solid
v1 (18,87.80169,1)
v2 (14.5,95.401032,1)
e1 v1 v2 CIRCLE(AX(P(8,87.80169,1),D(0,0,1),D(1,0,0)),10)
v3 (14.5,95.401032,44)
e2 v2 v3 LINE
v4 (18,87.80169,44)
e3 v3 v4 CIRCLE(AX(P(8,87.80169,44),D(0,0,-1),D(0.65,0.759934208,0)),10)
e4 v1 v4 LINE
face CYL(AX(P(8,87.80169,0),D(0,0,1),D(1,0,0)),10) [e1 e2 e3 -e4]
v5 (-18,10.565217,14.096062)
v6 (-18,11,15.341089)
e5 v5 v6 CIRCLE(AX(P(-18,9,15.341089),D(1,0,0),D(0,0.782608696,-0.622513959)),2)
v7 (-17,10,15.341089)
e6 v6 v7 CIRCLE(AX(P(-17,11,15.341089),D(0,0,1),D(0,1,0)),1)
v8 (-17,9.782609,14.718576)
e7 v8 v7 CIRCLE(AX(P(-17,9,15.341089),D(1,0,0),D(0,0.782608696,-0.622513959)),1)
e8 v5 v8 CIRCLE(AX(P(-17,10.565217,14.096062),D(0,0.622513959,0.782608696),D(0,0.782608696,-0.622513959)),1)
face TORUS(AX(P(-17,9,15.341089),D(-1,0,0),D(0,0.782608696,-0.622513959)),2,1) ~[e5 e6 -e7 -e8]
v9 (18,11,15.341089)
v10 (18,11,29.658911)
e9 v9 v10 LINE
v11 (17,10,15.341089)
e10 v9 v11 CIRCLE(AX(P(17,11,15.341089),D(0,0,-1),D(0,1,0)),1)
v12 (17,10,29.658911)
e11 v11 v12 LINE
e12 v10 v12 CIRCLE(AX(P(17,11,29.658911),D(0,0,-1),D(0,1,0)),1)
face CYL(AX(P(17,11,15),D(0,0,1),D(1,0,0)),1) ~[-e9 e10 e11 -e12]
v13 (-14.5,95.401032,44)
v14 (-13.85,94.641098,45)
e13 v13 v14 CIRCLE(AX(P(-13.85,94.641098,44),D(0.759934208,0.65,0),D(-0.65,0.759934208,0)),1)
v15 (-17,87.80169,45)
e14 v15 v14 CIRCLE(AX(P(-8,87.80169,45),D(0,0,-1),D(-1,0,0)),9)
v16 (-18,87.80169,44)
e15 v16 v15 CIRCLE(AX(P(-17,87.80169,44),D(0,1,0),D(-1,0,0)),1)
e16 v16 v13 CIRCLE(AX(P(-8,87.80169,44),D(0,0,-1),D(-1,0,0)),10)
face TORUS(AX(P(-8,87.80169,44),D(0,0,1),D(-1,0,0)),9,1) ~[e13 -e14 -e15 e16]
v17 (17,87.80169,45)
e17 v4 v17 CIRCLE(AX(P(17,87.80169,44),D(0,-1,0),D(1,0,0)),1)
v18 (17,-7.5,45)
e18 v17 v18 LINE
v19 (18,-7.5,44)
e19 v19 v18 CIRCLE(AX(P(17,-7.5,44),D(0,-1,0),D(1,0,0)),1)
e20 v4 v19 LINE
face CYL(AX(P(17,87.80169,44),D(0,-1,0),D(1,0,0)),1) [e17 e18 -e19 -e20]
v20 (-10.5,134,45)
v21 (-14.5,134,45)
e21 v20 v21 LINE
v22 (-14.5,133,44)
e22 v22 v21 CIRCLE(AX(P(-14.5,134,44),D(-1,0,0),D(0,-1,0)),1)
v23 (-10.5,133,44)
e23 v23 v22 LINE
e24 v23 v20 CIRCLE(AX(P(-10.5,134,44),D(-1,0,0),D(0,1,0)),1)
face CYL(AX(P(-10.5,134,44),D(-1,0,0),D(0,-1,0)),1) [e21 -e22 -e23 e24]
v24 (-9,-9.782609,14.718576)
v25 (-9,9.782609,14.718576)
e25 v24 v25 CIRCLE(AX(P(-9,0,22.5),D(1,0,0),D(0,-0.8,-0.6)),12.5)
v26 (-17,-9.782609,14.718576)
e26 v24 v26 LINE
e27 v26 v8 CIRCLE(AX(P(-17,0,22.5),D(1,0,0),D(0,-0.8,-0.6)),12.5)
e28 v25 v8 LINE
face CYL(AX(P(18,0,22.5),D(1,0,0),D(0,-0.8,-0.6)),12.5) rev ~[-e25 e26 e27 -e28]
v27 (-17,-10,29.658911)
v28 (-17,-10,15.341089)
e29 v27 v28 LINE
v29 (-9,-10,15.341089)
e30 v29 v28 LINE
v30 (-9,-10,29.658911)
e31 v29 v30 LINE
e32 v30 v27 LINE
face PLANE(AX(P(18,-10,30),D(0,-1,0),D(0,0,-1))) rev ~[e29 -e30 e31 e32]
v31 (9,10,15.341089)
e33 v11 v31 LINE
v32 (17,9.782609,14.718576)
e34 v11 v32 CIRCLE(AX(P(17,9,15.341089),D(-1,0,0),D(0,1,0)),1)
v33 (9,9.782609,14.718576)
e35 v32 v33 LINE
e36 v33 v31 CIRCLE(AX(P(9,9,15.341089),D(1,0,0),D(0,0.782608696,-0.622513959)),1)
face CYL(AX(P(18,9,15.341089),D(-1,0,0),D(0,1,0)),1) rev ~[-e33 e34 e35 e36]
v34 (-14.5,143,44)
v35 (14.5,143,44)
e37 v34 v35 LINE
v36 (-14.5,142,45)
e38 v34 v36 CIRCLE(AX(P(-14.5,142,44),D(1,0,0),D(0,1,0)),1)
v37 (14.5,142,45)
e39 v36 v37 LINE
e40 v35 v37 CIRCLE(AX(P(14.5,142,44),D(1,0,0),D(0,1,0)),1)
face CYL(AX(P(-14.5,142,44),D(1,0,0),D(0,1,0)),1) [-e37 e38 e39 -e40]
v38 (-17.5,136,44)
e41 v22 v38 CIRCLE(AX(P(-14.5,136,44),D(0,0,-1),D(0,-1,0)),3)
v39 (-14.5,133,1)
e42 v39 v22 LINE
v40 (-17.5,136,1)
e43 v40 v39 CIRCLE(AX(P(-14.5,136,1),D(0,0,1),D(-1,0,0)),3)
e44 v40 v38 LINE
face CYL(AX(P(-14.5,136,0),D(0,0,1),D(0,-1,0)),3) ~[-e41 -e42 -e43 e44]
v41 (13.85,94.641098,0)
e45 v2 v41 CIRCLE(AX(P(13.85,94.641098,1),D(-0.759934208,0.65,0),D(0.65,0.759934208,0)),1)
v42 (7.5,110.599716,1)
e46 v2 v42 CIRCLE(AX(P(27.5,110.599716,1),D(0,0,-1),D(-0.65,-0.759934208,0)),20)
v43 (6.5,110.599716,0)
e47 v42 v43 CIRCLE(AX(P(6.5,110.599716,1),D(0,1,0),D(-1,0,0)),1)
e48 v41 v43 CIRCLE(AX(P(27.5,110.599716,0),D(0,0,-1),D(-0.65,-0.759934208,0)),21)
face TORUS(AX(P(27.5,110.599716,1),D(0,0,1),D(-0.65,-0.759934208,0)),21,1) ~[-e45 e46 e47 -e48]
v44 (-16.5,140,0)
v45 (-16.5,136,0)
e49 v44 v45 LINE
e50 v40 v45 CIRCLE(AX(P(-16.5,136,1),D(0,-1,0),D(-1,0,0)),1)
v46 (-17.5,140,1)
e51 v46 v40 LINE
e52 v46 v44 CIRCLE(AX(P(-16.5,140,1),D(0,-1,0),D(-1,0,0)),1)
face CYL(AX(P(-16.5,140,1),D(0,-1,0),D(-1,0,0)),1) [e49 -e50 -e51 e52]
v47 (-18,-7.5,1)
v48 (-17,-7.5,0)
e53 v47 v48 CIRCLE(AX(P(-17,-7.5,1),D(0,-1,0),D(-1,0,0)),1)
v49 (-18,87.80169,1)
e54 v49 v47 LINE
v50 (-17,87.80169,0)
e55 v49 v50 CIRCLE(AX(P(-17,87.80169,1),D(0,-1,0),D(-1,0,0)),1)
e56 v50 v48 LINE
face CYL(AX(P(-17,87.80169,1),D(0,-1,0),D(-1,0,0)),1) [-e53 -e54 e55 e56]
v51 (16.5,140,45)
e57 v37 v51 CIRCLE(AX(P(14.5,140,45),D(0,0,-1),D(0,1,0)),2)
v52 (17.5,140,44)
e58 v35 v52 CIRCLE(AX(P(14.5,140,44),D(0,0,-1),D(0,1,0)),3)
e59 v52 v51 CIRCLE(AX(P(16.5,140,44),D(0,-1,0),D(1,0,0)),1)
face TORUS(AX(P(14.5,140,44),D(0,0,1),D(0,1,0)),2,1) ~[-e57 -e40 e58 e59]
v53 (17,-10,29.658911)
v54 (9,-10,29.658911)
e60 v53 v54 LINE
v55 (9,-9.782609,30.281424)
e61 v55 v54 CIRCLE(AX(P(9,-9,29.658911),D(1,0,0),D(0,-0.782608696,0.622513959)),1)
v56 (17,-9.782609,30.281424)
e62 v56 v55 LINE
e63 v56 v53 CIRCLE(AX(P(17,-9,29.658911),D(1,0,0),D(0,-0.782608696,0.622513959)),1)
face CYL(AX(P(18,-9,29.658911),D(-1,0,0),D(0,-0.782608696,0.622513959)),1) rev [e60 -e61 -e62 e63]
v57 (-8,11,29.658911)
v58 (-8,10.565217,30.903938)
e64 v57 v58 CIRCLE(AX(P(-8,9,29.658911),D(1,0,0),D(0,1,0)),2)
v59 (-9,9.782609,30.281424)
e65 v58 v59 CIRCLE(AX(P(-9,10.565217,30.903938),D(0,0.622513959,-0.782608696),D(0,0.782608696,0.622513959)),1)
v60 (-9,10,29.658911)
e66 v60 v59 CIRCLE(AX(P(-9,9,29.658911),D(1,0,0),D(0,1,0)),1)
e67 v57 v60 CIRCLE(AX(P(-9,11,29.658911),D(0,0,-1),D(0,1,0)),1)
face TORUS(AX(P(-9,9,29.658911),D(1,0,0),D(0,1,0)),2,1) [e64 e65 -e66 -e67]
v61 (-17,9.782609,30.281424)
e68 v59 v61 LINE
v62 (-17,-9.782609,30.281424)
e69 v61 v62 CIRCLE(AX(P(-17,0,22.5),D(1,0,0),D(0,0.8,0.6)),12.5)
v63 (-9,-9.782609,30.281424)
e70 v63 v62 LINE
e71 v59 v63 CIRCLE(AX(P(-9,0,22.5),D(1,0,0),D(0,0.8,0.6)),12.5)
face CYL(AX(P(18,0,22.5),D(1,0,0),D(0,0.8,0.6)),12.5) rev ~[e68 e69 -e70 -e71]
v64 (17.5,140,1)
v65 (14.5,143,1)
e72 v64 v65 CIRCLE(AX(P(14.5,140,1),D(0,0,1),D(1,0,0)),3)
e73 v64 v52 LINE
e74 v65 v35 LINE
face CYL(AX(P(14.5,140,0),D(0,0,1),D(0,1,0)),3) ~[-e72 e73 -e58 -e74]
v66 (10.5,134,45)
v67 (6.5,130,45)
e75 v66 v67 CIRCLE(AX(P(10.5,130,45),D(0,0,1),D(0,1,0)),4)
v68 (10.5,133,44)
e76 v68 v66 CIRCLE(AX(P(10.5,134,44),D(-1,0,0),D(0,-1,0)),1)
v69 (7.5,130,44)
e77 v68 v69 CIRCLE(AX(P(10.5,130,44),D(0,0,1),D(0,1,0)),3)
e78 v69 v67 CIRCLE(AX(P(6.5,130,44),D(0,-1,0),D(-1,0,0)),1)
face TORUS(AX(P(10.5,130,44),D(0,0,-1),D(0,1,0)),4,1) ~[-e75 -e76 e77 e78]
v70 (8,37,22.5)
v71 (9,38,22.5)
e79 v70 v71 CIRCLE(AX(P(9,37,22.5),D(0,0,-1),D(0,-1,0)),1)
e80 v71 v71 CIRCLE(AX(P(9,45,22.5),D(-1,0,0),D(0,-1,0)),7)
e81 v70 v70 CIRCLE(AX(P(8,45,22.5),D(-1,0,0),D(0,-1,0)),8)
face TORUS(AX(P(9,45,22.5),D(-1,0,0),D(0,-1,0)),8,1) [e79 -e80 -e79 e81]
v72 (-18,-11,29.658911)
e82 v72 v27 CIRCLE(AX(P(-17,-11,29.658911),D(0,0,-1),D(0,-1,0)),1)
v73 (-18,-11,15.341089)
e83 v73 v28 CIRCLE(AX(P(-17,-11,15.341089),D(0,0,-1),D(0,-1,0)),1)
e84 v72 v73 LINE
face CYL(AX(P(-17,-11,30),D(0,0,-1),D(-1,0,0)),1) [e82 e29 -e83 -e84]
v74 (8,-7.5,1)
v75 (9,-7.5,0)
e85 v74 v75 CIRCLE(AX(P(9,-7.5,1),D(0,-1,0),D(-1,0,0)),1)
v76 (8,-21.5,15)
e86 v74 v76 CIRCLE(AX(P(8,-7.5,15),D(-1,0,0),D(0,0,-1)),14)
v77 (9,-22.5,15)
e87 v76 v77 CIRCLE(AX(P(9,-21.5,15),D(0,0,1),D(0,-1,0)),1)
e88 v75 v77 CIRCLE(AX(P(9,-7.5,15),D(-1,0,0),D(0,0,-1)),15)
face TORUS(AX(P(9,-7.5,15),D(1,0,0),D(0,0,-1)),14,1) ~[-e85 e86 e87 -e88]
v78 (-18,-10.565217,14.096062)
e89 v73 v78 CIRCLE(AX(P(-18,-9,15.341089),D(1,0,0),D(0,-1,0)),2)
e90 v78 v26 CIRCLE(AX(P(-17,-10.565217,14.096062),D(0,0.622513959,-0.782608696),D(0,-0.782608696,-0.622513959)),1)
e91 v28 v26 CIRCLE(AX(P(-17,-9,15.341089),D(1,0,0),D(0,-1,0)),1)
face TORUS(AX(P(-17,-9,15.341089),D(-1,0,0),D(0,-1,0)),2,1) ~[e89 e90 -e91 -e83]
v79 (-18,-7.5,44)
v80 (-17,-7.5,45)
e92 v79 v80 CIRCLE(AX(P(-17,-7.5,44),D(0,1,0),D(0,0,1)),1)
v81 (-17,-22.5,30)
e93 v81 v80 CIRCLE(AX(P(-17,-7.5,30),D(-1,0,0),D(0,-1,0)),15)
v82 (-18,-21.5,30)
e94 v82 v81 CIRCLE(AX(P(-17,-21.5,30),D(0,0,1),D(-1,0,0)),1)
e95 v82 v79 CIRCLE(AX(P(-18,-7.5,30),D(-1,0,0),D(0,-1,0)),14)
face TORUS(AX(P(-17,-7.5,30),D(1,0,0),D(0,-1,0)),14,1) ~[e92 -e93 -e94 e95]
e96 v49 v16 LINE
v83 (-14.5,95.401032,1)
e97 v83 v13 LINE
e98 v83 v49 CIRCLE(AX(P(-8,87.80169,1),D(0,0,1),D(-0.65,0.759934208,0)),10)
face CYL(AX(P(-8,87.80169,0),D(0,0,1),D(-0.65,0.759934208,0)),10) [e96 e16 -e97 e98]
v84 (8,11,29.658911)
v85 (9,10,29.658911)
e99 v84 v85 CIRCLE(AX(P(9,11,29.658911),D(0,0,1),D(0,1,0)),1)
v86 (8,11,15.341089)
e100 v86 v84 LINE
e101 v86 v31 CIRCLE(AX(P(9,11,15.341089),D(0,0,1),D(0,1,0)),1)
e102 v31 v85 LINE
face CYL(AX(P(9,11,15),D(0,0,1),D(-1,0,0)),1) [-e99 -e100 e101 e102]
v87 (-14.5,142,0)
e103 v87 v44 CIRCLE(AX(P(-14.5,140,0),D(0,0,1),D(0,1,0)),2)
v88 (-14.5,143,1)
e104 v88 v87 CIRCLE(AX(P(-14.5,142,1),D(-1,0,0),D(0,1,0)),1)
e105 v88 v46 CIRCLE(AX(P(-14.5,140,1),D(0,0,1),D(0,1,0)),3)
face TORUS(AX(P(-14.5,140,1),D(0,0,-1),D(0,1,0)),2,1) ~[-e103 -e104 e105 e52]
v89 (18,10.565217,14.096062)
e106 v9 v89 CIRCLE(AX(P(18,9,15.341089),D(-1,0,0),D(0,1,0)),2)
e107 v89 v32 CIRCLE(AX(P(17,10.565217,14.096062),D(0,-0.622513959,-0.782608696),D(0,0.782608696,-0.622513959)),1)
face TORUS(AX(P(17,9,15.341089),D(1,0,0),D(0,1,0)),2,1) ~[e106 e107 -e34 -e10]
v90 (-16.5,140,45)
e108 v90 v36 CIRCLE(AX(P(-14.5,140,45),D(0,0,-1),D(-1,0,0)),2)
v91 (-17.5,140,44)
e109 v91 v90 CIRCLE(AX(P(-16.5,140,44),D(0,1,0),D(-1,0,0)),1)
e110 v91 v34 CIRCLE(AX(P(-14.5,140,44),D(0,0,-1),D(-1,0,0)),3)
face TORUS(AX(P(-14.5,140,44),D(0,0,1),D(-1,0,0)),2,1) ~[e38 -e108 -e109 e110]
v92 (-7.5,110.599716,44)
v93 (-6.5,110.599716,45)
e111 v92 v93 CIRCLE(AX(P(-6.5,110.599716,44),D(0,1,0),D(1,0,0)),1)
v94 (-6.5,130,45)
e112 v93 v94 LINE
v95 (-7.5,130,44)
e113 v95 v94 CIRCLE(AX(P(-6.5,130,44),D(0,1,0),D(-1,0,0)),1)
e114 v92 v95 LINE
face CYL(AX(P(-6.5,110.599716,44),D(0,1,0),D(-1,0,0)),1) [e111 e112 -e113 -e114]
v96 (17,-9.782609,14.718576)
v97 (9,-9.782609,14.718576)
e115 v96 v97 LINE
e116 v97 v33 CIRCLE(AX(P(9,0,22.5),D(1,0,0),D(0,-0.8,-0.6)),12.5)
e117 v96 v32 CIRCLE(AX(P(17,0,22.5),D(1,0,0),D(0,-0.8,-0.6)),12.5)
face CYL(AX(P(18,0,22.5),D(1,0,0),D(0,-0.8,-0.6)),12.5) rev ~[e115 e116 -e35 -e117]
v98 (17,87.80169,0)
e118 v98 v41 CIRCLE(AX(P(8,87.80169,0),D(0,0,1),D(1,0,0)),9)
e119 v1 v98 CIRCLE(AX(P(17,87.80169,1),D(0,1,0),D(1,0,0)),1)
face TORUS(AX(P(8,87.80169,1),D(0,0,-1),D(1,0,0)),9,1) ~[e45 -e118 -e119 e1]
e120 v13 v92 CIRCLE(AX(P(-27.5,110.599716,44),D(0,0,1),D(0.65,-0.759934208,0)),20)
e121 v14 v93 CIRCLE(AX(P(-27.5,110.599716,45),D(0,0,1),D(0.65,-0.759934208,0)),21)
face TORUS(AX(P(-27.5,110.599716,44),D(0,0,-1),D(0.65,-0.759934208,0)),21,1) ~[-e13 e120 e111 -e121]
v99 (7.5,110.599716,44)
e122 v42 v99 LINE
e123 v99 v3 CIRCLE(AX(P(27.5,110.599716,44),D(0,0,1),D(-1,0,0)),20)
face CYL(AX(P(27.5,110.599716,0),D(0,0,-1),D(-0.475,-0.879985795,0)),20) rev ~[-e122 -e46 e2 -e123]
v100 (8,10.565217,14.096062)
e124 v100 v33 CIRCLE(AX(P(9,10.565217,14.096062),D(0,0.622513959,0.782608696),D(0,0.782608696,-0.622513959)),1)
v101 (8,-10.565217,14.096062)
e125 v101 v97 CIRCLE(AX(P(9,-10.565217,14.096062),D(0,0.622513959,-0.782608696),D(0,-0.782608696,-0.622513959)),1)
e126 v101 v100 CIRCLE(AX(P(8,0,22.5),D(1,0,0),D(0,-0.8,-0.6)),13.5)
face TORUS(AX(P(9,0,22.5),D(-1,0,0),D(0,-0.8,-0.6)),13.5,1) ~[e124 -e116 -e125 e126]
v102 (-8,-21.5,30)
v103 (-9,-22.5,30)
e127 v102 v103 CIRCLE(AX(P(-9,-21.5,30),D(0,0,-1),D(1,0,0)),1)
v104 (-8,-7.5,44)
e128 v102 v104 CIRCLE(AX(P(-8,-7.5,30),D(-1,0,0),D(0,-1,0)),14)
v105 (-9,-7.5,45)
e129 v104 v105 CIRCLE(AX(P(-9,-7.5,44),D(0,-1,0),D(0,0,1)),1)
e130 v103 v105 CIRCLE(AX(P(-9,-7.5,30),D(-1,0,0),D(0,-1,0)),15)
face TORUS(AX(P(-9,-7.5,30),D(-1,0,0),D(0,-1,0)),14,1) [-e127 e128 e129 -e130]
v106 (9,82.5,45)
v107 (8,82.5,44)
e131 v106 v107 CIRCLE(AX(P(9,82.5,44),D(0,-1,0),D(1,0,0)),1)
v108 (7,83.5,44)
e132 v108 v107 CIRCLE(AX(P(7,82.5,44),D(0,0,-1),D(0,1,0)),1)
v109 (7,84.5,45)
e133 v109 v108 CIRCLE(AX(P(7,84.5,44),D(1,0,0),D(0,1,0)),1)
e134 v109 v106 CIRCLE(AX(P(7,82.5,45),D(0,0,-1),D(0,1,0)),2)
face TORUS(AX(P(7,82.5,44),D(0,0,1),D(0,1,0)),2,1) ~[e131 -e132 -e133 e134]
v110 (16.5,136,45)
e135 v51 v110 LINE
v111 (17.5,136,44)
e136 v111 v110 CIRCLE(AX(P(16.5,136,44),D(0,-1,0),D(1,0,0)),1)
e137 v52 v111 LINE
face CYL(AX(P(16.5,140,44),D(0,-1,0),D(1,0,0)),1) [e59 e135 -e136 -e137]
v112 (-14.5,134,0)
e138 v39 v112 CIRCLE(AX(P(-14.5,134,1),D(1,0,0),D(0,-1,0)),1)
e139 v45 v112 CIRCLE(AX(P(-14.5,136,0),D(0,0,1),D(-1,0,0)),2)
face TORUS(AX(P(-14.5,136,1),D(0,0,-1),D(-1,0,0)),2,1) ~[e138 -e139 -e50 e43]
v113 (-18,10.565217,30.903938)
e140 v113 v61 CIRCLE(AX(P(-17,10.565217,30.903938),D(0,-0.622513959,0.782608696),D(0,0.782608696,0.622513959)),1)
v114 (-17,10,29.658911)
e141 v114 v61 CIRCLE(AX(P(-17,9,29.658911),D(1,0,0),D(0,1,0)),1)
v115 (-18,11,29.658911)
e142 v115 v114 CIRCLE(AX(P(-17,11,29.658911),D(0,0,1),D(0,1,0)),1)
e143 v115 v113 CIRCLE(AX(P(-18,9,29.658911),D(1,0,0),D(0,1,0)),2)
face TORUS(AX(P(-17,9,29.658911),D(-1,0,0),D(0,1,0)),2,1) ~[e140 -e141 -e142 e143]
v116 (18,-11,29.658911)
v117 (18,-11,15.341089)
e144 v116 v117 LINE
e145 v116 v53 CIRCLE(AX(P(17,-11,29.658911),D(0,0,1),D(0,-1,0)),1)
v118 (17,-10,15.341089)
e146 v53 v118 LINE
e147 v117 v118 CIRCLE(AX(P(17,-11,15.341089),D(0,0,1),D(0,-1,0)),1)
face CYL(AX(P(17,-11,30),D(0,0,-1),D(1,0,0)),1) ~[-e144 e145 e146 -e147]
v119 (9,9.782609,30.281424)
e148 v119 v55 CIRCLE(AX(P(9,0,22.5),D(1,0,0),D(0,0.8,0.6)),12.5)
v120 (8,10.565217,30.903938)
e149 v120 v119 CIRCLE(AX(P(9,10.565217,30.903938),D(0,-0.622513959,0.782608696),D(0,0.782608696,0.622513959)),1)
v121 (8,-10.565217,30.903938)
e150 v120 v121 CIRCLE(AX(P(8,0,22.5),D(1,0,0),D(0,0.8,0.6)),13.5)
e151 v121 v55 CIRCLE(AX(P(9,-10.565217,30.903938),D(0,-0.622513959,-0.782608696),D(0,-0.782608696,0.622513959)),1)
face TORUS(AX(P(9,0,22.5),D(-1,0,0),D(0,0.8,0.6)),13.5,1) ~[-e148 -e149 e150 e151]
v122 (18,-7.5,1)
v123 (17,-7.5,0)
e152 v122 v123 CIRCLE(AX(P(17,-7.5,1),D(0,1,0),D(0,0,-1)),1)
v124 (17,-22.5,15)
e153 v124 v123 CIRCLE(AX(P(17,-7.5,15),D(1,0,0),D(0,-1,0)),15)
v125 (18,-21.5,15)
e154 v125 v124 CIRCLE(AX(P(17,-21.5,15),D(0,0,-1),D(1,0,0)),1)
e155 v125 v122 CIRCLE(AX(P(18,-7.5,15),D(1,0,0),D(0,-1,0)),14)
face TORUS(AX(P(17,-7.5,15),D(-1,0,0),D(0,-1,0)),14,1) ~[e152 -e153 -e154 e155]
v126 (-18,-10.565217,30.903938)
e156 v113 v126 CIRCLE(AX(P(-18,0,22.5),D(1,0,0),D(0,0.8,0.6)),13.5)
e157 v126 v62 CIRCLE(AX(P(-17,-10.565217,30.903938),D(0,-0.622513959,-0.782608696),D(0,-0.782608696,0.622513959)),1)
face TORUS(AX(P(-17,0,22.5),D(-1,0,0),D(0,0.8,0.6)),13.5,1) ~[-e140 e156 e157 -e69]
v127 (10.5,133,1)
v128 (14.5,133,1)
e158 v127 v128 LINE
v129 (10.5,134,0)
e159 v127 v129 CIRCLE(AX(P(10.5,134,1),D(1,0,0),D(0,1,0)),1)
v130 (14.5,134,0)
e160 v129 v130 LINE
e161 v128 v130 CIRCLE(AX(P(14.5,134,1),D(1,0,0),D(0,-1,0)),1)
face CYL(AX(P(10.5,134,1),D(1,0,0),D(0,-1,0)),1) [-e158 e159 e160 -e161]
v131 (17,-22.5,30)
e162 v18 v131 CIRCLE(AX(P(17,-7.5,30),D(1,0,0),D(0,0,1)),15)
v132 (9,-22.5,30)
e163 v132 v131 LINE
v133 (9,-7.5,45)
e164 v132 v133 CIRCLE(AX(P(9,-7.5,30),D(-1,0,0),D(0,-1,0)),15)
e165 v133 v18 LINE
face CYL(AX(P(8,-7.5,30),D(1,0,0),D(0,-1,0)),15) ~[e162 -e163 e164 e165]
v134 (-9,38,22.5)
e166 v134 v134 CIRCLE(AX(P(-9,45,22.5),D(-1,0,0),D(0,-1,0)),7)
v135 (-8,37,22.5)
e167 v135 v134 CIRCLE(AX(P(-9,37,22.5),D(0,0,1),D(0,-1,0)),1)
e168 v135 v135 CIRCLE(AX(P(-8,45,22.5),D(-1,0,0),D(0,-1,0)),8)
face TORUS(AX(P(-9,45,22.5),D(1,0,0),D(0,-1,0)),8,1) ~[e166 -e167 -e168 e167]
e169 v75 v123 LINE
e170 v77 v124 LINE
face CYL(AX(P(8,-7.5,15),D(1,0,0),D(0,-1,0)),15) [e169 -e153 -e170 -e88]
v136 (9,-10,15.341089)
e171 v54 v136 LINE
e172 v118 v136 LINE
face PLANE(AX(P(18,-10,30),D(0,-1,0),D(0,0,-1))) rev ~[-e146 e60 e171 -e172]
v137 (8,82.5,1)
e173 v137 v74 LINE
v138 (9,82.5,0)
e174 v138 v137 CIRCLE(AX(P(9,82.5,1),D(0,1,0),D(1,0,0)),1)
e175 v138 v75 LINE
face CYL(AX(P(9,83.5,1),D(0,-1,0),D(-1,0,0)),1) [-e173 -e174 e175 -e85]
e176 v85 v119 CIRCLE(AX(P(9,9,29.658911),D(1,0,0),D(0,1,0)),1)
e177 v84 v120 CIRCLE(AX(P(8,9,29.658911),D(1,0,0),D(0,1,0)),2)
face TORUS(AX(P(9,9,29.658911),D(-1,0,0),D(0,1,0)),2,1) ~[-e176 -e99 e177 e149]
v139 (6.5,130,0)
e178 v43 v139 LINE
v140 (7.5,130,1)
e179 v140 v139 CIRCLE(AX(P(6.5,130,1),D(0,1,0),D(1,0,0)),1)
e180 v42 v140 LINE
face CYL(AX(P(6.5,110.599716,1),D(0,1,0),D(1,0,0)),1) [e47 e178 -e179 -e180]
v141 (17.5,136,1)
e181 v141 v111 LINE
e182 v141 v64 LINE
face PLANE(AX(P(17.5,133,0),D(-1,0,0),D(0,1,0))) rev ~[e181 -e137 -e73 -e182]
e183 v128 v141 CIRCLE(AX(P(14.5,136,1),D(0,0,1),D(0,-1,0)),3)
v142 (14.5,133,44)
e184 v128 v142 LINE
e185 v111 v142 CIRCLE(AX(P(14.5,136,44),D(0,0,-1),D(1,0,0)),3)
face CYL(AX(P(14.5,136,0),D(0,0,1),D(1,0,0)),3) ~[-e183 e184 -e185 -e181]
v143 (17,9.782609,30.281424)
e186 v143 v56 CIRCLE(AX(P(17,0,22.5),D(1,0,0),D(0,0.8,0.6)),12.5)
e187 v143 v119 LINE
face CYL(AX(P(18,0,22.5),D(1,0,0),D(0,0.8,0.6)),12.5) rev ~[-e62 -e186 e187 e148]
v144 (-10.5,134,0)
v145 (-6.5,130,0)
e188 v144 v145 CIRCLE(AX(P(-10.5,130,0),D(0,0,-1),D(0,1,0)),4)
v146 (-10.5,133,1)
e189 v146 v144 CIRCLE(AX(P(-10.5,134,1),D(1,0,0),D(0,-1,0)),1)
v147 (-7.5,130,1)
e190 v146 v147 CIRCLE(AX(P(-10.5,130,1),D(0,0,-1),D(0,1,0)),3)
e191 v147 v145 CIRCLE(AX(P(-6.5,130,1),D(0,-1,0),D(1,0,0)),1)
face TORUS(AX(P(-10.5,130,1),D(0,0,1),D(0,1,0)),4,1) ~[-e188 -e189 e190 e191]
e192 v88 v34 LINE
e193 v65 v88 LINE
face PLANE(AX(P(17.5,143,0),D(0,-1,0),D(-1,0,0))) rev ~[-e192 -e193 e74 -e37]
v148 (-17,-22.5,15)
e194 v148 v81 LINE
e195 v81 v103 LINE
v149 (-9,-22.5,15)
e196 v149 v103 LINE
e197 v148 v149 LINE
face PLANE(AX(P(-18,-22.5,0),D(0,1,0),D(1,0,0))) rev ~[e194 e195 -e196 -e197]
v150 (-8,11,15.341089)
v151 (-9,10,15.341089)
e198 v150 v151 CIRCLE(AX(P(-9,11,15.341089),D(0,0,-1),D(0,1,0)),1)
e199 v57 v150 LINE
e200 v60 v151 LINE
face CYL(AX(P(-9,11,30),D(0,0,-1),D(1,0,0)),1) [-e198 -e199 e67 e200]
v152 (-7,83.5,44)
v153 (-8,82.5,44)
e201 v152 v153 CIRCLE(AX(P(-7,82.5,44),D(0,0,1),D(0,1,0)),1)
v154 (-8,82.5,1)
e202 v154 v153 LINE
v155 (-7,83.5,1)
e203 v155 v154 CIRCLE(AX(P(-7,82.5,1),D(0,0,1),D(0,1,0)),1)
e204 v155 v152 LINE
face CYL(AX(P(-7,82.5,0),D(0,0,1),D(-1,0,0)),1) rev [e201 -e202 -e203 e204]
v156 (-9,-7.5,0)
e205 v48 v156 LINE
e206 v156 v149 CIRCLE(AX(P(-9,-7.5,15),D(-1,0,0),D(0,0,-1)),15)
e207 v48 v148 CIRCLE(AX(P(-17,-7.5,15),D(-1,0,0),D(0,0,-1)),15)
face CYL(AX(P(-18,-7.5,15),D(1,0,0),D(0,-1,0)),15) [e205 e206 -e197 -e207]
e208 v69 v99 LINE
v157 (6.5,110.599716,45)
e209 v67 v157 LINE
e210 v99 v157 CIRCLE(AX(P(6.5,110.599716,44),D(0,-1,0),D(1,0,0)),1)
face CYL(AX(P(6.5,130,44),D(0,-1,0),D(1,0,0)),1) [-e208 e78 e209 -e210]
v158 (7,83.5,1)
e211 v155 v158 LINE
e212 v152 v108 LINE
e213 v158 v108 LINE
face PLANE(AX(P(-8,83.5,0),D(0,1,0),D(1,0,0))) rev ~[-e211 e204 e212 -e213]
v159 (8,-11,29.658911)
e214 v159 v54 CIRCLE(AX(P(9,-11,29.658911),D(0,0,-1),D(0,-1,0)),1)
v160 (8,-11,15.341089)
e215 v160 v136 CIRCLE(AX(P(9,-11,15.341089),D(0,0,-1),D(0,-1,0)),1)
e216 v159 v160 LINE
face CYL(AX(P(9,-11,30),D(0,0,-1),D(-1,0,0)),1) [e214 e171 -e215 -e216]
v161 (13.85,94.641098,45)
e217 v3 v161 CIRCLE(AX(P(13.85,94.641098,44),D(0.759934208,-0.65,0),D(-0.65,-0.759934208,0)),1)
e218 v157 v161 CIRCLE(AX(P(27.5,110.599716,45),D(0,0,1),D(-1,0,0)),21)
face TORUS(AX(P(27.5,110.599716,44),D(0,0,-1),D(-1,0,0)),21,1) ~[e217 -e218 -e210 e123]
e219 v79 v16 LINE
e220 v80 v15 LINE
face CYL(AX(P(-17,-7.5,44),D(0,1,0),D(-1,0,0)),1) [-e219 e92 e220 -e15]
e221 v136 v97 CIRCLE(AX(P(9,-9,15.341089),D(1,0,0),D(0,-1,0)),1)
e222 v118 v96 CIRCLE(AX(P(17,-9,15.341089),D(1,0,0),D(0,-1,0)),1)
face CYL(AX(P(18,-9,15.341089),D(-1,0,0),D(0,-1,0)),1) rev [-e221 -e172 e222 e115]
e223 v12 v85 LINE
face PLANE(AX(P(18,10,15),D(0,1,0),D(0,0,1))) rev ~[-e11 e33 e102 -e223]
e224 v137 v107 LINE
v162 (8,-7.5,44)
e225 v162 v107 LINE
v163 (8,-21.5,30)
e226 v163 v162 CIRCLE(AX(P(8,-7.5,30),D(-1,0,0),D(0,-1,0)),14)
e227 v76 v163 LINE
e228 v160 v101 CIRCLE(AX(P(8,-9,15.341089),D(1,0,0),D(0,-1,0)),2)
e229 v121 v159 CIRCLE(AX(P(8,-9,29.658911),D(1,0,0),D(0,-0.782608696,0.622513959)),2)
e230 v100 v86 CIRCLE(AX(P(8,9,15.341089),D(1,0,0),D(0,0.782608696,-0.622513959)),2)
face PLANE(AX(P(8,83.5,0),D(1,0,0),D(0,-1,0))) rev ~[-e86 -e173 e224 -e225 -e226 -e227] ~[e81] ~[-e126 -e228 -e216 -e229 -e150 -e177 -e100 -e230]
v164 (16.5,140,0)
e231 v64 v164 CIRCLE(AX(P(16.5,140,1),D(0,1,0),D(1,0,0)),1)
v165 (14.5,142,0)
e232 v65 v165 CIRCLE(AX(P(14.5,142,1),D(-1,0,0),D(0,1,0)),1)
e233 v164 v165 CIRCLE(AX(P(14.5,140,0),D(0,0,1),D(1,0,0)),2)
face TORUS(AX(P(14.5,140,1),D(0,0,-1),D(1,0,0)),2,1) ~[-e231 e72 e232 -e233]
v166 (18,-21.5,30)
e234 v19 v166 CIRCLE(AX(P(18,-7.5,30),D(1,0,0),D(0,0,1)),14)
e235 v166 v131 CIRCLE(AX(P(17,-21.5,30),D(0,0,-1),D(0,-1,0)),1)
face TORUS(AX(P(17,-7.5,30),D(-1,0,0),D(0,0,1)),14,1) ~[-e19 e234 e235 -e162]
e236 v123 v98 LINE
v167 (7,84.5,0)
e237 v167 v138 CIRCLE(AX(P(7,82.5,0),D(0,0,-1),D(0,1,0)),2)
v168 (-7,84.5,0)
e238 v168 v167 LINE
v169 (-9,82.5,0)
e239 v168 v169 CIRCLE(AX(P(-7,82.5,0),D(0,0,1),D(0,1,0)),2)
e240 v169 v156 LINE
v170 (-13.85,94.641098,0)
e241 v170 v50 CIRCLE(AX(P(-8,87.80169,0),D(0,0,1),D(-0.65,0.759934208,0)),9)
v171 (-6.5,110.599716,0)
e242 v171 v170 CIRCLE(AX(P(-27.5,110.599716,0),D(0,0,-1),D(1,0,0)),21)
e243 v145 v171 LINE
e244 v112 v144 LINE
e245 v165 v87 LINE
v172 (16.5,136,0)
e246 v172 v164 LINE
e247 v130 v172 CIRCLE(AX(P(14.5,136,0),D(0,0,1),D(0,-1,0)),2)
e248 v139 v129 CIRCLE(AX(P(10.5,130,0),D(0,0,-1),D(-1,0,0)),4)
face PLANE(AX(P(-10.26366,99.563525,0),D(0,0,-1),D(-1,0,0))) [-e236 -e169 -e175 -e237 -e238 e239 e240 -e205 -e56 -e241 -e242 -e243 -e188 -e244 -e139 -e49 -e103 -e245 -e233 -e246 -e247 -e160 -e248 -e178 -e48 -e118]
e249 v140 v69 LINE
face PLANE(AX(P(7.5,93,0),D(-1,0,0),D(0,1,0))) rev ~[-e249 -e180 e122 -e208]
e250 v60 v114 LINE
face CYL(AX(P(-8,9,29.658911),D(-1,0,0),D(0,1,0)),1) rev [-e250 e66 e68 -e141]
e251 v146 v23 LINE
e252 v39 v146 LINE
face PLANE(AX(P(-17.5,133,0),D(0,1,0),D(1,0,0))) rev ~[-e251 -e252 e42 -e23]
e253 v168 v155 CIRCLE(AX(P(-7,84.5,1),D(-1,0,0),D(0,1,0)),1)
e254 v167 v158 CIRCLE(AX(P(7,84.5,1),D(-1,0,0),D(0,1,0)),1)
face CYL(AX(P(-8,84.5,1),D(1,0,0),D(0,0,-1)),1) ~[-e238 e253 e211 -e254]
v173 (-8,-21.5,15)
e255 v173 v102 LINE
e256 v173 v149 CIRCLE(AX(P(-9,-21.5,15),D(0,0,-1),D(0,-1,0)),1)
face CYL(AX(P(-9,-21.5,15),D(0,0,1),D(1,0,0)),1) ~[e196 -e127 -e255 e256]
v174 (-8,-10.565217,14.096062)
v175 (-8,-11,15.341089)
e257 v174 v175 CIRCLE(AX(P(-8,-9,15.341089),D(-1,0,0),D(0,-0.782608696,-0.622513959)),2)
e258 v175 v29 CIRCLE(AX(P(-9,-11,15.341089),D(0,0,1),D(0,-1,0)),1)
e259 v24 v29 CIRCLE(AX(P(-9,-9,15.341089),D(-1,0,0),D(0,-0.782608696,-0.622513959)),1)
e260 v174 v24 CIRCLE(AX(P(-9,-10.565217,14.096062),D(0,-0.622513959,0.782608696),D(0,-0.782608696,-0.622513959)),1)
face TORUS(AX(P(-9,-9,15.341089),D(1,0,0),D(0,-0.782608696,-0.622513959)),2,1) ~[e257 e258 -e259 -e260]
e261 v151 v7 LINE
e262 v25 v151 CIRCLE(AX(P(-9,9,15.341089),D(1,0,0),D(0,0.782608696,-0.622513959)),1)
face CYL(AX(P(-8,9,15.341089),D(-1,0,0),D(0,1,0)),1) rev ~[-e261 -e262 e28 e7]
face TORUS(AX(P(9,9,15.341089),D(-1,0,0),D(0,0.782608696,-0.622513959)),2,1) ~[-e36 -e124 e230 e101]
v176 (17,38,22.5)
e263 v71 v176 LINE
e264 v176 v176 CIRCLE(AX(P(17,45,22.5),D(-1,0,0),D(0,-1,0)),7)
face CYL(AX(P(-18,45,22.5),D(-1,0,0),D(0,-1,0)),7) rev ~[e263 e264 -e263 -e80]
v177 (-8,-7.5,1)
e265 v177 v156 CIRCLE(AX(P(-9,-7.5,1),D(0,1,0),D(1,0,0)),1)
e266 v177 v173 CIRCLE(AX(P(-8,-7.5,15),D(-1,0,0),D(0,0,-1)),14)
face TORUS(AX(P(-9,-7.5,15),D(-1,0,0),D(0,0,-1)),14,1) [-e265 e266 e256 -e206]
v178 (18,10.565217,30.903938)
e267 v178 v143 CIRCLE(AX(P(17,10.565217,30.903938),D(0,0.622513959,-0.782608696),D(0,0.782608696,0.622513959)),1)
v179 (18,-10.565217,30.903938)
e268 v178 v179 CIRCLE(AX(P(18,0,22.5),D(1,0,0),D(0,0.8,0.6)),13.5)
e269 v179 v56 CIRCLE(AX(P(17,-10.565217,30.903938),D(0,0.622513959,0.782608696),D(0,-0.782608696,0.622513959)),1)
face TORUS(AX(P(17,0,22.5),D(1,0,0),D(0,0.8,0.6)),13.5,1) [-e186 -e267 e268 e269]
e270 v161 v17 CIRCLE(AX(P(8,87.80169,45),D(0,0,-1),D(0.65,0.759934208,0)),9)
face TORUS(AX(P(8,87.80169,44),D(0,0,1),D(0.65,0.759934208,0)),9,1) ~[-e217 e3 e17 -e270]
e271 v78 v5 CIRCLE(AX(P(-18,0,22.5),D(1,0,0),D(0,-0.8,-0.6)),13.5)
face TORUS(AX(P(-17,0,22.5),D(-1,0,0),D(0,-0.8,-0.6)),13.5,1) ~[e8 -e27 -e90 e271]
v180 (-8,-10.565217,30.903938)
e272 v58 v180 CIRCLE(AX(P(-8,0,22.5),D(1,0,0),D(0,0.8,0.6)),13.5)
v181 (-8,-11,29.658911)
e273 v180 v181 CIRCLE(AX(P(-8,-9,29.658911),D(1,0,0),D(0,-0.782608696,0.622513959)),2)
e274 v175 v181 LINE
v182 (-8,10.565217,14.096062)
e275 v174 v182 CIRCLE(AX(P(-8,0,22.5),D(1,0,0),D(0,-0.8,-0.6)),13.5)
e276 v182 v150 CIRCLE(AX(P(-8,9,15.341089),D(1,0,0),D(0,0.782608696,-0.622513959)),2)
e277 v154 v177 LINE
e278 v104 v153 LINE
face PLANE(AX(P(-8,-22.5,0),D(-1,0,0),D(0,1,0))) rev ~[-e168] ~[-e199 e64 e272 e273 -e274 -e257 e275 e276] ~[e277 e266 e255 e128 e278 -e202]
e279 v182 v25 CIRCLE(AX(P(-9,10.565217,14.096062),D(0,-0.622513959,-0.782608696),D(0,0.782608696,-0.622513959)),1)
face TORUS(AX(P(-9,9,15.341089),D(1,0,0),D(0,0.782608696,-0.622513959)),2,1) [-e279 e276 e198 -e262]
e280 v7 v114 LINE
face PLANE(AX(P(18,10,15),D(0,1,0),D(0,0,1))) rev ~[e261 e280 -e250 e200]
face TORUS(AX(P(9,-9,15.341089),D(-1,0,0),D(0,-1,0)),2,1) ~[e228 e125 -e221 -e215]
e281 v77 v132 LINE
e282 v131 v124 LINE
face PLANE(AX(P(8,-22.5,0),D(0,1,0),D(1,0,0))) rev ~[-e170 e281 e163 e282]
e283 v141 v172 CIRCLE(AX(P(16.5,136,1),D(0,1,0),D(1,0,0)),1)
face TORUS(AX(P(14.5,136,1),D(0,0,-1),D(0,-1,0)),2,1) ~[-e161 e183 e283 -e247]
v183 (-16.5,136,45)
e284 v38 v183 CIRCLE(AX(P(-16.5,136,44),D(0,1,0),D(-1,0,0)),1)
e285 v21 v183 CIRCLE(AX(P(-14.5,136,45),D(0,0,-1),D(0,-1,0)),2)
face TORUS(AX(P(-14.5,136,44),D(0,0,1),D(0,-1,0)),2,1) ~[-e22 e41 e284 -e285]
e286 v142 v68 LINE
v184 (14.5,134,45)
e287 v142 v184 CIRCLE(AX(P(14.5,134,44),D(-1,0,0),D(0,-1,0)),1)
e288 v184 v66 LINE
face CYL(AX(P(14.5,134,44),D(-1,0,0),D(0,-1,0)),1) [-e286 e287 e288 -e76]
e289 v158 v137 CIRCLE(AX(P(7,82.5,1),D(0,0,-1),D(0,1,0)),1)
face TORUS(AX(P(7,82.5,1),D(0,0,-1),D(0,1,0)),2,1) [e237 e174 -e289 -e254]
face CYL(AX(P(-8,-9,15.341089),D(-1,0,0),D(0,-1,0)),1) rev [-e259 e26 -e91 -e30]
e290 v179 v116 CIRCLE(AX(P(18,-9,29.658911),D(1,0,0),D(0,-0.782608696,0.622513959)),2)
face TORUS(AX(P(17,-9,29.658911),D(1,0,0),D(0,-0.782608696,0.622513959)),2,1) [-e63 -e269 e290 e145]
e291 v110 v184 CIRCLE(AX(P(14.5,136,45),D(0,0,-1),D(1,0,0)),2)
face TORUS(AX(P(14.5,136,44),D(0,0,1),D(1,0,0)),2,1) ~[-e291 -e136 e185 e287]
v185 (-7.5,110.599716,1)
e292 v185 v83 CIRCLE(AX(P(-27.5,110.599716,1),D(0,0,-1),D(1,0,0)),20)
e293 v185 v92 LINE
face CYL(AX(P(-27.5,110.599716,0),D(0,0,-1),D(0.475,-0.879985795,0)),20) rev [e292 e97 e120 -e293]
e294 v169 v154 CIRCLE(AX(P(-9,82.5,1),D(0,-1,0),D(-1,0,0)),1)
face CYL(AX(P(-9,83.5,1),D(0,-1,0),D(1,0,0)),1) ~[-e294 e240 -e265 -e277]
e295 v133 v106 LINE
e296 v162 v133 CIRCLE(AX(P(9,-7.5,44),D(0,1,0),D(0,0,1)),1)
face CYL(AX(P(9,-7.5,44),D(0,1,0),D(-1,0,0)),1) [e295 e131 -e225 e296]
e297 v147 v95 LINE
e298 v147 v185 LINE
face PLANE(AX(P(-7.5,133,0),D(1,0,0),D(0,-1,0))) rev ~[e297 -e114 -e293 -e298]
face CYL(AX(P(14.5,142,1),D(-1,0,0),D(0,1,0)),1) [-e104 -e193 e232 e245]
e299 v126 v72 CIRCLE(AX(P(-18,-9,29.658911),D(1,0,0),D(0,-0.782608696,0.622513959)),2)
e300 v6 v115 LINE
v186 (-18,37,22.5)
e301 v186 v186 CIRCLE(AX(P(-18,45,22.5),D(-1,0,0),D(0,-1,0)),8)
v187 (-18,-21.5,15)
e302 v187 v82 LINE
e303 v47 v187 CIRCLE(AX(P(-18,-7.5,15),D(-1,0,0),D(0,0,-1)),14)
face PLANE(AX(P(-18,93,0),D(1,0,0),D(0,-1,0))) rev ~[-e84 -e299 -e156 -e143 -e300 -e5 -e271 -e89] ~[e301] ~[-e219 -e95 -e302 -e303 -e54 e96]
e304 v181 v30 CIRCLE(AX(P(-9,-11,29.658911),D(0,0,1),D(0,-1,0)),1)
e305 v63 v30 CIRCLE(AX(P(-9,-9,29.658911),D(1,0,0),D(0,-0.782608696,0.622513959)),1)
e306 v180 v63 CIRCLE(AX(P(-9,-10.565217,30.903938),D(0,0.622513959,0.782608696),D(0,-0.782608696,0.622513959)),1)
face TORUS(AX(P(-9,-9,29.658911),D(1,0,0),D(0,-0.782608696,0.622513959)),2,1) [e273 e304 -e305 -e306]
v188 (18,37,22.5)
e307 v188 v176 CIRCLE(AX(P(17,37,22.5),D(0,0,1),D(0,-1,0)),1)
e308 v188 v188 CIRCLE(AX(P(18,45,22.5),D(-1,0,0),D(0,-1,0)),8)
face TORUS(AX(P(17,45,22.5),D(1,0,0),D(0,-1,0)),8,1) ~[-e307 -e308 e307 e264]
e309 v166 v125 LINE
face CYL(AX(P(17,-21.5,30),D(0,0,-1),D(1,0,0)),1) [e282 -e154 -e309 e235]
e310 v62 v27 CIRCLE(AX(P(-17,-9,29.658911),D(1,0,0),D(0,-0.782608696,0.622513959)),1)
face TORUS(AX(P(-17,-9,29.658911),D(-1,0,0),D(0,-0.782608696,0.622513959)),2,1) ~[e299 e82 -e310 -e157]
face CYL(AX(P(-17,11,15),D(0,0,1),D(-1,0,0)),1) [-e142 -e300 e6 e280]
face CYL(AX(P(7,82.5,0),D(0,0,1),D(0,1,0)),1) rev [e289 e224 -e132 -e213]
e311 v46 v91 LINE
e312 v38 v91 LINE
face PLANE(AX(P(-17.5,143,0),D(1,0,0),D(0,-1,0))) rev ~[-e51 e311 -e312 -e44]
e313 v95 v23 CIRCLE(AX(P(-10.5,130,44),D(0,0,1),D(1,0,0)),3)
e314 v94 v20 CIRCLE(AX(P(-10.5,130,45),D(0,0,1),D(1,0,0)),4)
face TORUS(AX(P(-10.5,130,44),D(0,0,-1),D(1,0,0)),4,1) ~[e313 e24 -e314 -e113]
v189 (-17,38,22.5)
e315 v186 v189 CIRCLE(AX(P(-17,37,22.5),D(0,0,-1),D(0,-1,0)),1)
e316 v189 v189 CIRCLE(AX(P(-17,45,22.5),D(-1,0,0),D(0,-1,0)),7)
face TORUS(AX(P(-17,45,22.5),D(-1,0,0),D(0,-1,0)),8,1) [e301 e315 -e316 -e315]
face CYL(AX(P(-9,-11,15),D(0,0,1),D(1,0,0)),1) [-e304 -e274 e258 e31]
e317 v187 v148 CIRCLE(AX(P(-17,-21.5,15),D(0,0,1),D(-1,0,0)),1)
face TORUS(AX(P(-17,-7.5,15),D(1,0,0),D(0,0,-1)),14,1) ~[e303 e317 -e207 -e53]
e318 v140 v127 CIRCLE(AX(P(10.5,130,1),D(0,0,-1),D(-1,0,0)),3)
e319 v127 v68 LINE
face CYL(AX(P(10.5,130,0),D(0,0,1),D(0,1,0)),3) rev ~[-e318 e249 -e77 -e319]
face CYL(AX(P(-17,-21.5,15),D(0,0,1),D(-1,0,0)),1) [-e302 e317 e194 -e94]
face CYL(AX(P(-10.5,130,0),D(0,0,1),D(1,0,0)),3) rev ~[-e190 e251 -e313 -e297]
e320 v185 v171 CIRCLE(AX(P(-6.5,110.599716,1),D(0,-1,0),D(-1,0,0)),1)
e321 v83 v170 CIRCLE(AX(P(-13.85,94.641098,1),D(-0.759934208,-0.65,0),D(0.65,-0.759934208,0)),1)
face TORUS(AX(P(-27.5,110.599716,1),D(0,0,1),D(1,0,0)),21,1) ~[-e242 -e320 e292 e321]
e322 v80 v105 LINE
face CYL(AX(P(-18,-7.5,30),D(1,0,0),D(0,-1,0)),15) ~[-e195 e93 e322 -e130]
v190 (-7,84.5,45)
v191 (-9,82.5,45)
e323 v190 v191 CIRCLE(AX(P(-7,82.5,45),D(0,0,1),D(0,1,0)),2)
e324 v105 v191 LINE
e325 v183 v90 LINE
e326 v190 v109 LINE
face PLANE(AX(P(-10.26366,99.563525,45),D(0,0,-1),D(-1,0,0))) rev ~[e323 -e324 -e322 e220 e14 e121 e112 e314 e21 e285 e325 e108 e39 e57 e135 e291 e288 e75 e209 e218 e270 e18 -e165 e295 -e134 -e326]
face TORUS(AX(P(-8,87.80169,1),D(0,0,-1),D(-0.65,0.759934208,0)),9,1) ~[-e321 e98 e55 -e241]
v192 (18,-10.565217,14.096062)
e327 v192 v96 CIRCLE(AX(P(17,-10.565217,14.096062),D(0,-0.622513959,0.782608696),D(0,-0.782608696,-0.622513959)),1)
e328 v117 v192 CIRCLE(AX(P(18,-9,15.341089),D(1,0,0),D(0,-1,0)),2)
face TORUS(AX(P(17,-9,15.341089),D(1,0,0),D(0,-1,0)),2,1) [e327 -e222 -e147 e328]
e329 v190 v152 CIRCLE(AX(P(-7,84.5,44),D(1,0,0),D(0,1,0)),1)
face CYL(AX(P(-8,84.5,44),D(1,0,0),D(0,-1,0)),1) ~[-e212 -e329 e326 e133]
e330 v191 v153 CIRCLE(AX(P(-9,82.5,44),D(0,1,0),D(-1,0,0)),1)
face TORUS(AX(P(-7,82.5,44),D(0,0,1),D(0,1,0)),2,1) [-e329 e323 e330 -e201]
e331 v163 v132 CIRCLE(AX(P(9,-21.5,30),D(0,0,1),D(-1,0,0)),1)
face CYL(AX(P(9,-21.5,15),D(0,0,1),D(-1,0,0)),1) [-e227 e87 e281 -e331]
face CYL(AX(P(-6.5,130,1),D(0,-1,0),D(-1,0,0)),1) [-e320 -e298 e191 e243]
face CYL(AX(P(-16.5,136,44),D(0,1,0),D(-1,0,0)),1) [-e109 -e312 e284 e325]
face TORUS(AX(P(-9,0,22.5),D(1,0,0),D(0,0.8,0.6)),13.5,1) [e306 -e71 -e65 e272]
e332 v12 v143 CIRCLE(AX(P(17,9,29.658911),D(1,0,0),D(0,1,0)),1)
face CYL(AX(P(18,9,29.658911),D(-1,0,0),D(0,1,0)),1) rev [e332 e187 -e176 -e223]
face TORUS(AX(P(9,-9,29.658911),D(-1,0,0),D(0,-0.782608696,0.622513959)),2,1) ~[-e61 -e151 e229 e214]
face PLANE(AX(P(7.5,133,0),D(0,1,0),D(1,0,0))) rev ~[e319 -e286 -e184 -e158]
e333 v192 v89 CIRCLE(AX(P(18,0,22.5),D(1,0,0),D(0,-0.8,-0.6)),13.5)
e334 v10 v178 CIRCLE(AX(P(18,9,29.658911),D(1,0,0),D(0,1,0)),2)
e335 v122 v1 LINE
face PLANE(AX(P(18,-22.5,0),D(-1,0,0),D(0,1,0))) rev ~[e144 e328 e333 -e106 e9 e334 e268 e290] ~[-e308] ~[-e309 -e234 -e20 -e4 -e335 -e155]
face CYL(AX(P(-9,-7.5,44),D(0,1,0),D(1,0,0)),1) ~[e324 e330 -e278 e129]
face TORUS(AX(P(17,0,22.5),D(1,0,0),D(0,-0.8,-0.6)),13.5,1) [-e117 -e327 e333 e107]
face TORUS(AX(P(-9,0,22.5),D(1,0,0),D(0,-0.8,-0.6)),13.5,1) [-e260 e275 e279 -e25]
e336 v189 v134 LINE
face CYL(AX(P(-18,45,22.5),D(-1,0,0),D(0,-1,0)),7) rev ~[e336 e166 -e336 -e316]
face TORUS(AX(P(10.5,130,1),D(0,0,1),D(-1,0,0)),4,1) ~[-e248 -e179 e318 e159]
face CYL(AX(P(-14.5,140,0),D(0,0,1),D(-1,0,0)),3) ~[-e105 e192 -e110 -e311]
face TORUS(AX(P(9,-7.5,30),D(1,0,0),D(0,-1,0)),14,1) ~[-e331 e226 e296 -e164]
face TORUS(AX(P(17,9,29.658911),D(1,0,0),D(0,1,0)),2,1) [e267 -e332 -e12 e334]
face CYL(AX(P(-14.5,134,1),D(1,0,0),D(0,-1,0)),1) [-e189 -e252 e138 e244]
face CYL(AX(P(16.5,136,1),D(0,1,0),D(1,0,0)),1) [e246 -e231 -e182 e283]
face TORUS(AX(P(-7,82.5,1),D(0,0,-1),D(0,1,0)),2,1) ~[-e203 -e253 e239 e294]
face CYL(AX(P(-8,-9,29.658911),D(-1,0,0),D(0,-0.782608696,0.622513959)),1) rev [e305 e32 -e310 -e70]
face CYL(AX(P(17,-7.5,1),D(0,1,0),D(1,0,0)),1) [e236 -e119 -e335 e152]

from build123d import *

# Parameters (mm, degrees)
F0_W        = 10
F0_H        = 10
F0_H_2      = 25
F0_W_2      = 15
F0_H_3      = 9.5
F0_H_4      = 40
F0_H_5      = 5
F1_DEPTH    = 45
F2_R        = 15
F4_DEPTH    = 36.001
F5_T1_DEPTH = 45
F6_R        = 10
F7_R        = 3
F8_R        = 1
F9_R        = 7
F10_DEPTH   = 36.0010001
F11_R       = 1


# Not quite as in the source:
# - a fillet or chamfer that OpenCascade refuses, or shapes differently, is made with other operations: its cross-section is extruded or revolved along the edge and cut away or added


with BuildPart() as f1:
    # F0 (on Top) → F1 (new body)
    with BuildSketch(Plane.XY):
        with Locations((-13, -17.5)):
            Rectangle(F0_W, F0_H)
        with Locations((-13, 0)):
            Rectangle(F0_W, F0_H_2)
        Polygon((-18, 12.5), (-8, 12.5), (-8, 83), (-8, 83.5), (-7.5, 83.5), (-7.5, 93), (-18, 93), align=None)
        with Locations((0, 88.25)):
            Rectangle(F0_W_2, F0_H_3)
        with Locations((0, 113)):
            Rectangle(F0_W_2, F0_H_4)
        Polygon((8, 83), (8, 12.5), (18, 12.5), (18, 93), (7.5, 93), (7.5, 83.5), (8, 83.5), align=None)
        with Locations((13, 0)):
            Rectangle(F0_W, F0_H_2)
        with Locations((13, -17.5)):
            Rectangle(F0_W, F0_H)
        with Locations((0, 135.5)):
            Rectangle(F0_W_2, F0_H_5)
        Polygon((7.5, 138), (7.5, 133), (17.5, 133), (17.5, 143), (-17.5, 143), (-17.5, 133), (-7.5, 133), (-7.5, 138), align=None)
    extrude(amount=F1_DEPTH)

    # F2
    f2_edges = [f1.edges().sort_by_distance(p)[0] for p in [
        (-13, -22.5, 45),
        (-13, -22.5, 0),
        (13, -22.5, 45),
        (13, -22.5, 0),
    ]]
    fillet(f2_edges, radius=F2_R)

    # F3 (on face) → F4 (cut, through all)
    with BuildSketch(Plane.YZ.offset(18)):
        with BuildLine():
            Line((10, 15), (10, 30))
            ThreePointArc((10, 30), (0, 35), (-10, 30))
            Line((-10, 30), (-10, 15))
            ThreePointArc((-10, 15), (0, 10), (10, 15))
        make_face()
    extrude(amount=-F4_DEPTH, mode=Mode.SUBTRACT)

    # F5: fillet of radius 20 on 2 edges, made by hand

    # F5_s2 → F5_t1 (join)
    with BuildSketch(Plane.XY):
        with BuildLine():
            ThreePointArc((-18, 93), (-10.3244359627, 100.3527651408), (-7.5, 110.5997159068))
            Line((-7.5, 110.5997159068), (-7.5, 93))
            Line((-7.5, 93), (-18, 93))
        make_face()
        with BuildLine():
            ThreePointArc((18, 93), (10.3244359627, 100.3527651408), (7.5, 110.5997159068))
            Line((7.5, 110.5997159068), (7.5, 93))
            Line((7.5, 93), (18, 93))
        make_face()
    extrude(amount=F5_T1_DEPTH)

    # F6
    f6_edges = [f1.edges().sort_by_distance(p)[0] for p in [
        (18, 93, 22.5),
        (-18, 93, 22.5),
    ]]
    fillet(f6_edges, radius=F6_R)

    # F7
    f7_edges = [f1.edges().sort_by_distance(p)[0] for p in [
        (-7.5, 133, 22.5),
        (-17.5, 133, 22.5),
        (-17.5, 143, 22.5),
        (7.5, 133, 22.5),
        (17.5, 133, 22.5),
        (17.5, 143, 22.5),
    ]]
    fillet(f7_edges, radius=F7_R)

    # F8
    f8_edges = [f1.edges().sort_by_distance(p)[0] for p in [
        (-18, -22.5, 22.5),
        (-13, -22.5, 15),
        (-13, -22.5, 30),
        (-8, -22.5, 22.5),
        (8, -22.5, 22.5),
        (13, -22.5, 15),
        (13, -22.5, 30),
        (18, -22.5, 22.5),
        (18, 0, 10),
        (13, 10, 15),
        (8, 0, 10),
        (13, -10, 15),
        (18, -10, 22.5),
        (8, -10, 22.5),
        (13, -10, 30),
        (18, 0, 35),
        (8, 0, 35),
        (13, 10, 30),
        (-8, -10, 22.5),
        (-13, -10, 15),
        (-18, -10, 22.5),
        (-13, -10, 30),
        (-8, 0, 35),
        (-18, 0, 35),
        (-13, 10, 30),
        (-8, 10, 22.5),
        (-18, 10, 22.5),
        (-13, 10, 15),
        (-8, 83.5, 22.5),
        (8, 83.5, 22.5),
        (0, 83.5, 0),
        (0, 83.5, 45),
        (7.5, 120.299858, 0),
        (8.37868, 132.12132, 0),
        (9.334098, 102.233116, 0),
        (12.5, 133, 0),
        (17.082951, 91.98499, 0),
        (16.62132, 133.87868, 0),
        (18, 40.150845, 0),
        (17.5, 138, 0),
        (16.62132, 142.12132, 0),
        (8, 38, 0),
        (0, 143, 0),
        (-16.62132, 142.12132, 0),
        (-8, 38, 0),
        (-17.5, 138, 0),
        (-16.62132, 133.87868, 0),
        (-18, 40.150845, 0),
        (-12.5, 133, 0),
        (-17.082951, 91.98499, 0),
        (-8.37868, 132.12132, 0),
        (-9.334098, 102.233116, 0),
        (-7.5, 120.299858, 0),
        (7.5, 120.299858, 45),
        (8.37868, 132.12132, 45),
        (9.334098, 102.233116, 45),
        (12.5, 133, 45),
        (17.082951, 91.98499, 45),
        (16.62132, 133.87868, 45),
        (18, -18.106602, 4.393398),
        (18, 40.150845, 45),
        (18, -18.106602, 40.606602),
        (18, 10, 22.5),
        (17.5, 138, 45),
        (8, -18.106602, 4.393398),
        (16.62132, 142.12132, 45),
        (8, -18.106602, 40.606602),
        (8, 38, 45),
        (8, 10, 22.5),
        (0, 143, 45),
        (-16.62132, 142.12132, 45),
        (-8, -18.106602, 4.393398),
        (-8, -18.106602, 40.606602),
        (-8, 38, 45),
        (-8, 0, 10),
        (-17.5, 138, 45),
        (-18, -18.106602, 4.393398),
        (-16.62132, 133.87868, 45),
        (-18, 40.150845, 45),
        (-18, -18.106602, 40.606602),
        (-18, 0, 10),
        (-12.5, 133, 45),
        (-17.082951, 91.98499, 45),
        (-8.37868, 132.12132, 45),
        (-9.334098, 102.233116, 45),
        (-7.5, 120.299858, 45),
    ]]
    fillet(f8_edges, radius=F8_R)

    # F9 (on face) → F10 (cut, through all)
    with BuildSketch(Plane(origin=(-18, 0, 0), x_dir=(0, -1, 0), z_dir=(-1, 0, 0))):
        with Locations((-45, 22.5)):
            Circle(F9_R)
    extrude(amount=-F10_DEPTH, mode=Mode.SUBTRACT)

    # F11
    f11_edges = [f1.edges().sort_by_distance(p)[0] for p in [
        (8, 52, 22.5),
        (13, 38, 22.5),
        (18, 52, 22.5),
        (-18, 52, 22.5),
        (-13, 38, 22.5),
        (-8, 52, 22.5),
    ]]
    fillet(f11_edges, radius=F11_R)


solid = f1.part
